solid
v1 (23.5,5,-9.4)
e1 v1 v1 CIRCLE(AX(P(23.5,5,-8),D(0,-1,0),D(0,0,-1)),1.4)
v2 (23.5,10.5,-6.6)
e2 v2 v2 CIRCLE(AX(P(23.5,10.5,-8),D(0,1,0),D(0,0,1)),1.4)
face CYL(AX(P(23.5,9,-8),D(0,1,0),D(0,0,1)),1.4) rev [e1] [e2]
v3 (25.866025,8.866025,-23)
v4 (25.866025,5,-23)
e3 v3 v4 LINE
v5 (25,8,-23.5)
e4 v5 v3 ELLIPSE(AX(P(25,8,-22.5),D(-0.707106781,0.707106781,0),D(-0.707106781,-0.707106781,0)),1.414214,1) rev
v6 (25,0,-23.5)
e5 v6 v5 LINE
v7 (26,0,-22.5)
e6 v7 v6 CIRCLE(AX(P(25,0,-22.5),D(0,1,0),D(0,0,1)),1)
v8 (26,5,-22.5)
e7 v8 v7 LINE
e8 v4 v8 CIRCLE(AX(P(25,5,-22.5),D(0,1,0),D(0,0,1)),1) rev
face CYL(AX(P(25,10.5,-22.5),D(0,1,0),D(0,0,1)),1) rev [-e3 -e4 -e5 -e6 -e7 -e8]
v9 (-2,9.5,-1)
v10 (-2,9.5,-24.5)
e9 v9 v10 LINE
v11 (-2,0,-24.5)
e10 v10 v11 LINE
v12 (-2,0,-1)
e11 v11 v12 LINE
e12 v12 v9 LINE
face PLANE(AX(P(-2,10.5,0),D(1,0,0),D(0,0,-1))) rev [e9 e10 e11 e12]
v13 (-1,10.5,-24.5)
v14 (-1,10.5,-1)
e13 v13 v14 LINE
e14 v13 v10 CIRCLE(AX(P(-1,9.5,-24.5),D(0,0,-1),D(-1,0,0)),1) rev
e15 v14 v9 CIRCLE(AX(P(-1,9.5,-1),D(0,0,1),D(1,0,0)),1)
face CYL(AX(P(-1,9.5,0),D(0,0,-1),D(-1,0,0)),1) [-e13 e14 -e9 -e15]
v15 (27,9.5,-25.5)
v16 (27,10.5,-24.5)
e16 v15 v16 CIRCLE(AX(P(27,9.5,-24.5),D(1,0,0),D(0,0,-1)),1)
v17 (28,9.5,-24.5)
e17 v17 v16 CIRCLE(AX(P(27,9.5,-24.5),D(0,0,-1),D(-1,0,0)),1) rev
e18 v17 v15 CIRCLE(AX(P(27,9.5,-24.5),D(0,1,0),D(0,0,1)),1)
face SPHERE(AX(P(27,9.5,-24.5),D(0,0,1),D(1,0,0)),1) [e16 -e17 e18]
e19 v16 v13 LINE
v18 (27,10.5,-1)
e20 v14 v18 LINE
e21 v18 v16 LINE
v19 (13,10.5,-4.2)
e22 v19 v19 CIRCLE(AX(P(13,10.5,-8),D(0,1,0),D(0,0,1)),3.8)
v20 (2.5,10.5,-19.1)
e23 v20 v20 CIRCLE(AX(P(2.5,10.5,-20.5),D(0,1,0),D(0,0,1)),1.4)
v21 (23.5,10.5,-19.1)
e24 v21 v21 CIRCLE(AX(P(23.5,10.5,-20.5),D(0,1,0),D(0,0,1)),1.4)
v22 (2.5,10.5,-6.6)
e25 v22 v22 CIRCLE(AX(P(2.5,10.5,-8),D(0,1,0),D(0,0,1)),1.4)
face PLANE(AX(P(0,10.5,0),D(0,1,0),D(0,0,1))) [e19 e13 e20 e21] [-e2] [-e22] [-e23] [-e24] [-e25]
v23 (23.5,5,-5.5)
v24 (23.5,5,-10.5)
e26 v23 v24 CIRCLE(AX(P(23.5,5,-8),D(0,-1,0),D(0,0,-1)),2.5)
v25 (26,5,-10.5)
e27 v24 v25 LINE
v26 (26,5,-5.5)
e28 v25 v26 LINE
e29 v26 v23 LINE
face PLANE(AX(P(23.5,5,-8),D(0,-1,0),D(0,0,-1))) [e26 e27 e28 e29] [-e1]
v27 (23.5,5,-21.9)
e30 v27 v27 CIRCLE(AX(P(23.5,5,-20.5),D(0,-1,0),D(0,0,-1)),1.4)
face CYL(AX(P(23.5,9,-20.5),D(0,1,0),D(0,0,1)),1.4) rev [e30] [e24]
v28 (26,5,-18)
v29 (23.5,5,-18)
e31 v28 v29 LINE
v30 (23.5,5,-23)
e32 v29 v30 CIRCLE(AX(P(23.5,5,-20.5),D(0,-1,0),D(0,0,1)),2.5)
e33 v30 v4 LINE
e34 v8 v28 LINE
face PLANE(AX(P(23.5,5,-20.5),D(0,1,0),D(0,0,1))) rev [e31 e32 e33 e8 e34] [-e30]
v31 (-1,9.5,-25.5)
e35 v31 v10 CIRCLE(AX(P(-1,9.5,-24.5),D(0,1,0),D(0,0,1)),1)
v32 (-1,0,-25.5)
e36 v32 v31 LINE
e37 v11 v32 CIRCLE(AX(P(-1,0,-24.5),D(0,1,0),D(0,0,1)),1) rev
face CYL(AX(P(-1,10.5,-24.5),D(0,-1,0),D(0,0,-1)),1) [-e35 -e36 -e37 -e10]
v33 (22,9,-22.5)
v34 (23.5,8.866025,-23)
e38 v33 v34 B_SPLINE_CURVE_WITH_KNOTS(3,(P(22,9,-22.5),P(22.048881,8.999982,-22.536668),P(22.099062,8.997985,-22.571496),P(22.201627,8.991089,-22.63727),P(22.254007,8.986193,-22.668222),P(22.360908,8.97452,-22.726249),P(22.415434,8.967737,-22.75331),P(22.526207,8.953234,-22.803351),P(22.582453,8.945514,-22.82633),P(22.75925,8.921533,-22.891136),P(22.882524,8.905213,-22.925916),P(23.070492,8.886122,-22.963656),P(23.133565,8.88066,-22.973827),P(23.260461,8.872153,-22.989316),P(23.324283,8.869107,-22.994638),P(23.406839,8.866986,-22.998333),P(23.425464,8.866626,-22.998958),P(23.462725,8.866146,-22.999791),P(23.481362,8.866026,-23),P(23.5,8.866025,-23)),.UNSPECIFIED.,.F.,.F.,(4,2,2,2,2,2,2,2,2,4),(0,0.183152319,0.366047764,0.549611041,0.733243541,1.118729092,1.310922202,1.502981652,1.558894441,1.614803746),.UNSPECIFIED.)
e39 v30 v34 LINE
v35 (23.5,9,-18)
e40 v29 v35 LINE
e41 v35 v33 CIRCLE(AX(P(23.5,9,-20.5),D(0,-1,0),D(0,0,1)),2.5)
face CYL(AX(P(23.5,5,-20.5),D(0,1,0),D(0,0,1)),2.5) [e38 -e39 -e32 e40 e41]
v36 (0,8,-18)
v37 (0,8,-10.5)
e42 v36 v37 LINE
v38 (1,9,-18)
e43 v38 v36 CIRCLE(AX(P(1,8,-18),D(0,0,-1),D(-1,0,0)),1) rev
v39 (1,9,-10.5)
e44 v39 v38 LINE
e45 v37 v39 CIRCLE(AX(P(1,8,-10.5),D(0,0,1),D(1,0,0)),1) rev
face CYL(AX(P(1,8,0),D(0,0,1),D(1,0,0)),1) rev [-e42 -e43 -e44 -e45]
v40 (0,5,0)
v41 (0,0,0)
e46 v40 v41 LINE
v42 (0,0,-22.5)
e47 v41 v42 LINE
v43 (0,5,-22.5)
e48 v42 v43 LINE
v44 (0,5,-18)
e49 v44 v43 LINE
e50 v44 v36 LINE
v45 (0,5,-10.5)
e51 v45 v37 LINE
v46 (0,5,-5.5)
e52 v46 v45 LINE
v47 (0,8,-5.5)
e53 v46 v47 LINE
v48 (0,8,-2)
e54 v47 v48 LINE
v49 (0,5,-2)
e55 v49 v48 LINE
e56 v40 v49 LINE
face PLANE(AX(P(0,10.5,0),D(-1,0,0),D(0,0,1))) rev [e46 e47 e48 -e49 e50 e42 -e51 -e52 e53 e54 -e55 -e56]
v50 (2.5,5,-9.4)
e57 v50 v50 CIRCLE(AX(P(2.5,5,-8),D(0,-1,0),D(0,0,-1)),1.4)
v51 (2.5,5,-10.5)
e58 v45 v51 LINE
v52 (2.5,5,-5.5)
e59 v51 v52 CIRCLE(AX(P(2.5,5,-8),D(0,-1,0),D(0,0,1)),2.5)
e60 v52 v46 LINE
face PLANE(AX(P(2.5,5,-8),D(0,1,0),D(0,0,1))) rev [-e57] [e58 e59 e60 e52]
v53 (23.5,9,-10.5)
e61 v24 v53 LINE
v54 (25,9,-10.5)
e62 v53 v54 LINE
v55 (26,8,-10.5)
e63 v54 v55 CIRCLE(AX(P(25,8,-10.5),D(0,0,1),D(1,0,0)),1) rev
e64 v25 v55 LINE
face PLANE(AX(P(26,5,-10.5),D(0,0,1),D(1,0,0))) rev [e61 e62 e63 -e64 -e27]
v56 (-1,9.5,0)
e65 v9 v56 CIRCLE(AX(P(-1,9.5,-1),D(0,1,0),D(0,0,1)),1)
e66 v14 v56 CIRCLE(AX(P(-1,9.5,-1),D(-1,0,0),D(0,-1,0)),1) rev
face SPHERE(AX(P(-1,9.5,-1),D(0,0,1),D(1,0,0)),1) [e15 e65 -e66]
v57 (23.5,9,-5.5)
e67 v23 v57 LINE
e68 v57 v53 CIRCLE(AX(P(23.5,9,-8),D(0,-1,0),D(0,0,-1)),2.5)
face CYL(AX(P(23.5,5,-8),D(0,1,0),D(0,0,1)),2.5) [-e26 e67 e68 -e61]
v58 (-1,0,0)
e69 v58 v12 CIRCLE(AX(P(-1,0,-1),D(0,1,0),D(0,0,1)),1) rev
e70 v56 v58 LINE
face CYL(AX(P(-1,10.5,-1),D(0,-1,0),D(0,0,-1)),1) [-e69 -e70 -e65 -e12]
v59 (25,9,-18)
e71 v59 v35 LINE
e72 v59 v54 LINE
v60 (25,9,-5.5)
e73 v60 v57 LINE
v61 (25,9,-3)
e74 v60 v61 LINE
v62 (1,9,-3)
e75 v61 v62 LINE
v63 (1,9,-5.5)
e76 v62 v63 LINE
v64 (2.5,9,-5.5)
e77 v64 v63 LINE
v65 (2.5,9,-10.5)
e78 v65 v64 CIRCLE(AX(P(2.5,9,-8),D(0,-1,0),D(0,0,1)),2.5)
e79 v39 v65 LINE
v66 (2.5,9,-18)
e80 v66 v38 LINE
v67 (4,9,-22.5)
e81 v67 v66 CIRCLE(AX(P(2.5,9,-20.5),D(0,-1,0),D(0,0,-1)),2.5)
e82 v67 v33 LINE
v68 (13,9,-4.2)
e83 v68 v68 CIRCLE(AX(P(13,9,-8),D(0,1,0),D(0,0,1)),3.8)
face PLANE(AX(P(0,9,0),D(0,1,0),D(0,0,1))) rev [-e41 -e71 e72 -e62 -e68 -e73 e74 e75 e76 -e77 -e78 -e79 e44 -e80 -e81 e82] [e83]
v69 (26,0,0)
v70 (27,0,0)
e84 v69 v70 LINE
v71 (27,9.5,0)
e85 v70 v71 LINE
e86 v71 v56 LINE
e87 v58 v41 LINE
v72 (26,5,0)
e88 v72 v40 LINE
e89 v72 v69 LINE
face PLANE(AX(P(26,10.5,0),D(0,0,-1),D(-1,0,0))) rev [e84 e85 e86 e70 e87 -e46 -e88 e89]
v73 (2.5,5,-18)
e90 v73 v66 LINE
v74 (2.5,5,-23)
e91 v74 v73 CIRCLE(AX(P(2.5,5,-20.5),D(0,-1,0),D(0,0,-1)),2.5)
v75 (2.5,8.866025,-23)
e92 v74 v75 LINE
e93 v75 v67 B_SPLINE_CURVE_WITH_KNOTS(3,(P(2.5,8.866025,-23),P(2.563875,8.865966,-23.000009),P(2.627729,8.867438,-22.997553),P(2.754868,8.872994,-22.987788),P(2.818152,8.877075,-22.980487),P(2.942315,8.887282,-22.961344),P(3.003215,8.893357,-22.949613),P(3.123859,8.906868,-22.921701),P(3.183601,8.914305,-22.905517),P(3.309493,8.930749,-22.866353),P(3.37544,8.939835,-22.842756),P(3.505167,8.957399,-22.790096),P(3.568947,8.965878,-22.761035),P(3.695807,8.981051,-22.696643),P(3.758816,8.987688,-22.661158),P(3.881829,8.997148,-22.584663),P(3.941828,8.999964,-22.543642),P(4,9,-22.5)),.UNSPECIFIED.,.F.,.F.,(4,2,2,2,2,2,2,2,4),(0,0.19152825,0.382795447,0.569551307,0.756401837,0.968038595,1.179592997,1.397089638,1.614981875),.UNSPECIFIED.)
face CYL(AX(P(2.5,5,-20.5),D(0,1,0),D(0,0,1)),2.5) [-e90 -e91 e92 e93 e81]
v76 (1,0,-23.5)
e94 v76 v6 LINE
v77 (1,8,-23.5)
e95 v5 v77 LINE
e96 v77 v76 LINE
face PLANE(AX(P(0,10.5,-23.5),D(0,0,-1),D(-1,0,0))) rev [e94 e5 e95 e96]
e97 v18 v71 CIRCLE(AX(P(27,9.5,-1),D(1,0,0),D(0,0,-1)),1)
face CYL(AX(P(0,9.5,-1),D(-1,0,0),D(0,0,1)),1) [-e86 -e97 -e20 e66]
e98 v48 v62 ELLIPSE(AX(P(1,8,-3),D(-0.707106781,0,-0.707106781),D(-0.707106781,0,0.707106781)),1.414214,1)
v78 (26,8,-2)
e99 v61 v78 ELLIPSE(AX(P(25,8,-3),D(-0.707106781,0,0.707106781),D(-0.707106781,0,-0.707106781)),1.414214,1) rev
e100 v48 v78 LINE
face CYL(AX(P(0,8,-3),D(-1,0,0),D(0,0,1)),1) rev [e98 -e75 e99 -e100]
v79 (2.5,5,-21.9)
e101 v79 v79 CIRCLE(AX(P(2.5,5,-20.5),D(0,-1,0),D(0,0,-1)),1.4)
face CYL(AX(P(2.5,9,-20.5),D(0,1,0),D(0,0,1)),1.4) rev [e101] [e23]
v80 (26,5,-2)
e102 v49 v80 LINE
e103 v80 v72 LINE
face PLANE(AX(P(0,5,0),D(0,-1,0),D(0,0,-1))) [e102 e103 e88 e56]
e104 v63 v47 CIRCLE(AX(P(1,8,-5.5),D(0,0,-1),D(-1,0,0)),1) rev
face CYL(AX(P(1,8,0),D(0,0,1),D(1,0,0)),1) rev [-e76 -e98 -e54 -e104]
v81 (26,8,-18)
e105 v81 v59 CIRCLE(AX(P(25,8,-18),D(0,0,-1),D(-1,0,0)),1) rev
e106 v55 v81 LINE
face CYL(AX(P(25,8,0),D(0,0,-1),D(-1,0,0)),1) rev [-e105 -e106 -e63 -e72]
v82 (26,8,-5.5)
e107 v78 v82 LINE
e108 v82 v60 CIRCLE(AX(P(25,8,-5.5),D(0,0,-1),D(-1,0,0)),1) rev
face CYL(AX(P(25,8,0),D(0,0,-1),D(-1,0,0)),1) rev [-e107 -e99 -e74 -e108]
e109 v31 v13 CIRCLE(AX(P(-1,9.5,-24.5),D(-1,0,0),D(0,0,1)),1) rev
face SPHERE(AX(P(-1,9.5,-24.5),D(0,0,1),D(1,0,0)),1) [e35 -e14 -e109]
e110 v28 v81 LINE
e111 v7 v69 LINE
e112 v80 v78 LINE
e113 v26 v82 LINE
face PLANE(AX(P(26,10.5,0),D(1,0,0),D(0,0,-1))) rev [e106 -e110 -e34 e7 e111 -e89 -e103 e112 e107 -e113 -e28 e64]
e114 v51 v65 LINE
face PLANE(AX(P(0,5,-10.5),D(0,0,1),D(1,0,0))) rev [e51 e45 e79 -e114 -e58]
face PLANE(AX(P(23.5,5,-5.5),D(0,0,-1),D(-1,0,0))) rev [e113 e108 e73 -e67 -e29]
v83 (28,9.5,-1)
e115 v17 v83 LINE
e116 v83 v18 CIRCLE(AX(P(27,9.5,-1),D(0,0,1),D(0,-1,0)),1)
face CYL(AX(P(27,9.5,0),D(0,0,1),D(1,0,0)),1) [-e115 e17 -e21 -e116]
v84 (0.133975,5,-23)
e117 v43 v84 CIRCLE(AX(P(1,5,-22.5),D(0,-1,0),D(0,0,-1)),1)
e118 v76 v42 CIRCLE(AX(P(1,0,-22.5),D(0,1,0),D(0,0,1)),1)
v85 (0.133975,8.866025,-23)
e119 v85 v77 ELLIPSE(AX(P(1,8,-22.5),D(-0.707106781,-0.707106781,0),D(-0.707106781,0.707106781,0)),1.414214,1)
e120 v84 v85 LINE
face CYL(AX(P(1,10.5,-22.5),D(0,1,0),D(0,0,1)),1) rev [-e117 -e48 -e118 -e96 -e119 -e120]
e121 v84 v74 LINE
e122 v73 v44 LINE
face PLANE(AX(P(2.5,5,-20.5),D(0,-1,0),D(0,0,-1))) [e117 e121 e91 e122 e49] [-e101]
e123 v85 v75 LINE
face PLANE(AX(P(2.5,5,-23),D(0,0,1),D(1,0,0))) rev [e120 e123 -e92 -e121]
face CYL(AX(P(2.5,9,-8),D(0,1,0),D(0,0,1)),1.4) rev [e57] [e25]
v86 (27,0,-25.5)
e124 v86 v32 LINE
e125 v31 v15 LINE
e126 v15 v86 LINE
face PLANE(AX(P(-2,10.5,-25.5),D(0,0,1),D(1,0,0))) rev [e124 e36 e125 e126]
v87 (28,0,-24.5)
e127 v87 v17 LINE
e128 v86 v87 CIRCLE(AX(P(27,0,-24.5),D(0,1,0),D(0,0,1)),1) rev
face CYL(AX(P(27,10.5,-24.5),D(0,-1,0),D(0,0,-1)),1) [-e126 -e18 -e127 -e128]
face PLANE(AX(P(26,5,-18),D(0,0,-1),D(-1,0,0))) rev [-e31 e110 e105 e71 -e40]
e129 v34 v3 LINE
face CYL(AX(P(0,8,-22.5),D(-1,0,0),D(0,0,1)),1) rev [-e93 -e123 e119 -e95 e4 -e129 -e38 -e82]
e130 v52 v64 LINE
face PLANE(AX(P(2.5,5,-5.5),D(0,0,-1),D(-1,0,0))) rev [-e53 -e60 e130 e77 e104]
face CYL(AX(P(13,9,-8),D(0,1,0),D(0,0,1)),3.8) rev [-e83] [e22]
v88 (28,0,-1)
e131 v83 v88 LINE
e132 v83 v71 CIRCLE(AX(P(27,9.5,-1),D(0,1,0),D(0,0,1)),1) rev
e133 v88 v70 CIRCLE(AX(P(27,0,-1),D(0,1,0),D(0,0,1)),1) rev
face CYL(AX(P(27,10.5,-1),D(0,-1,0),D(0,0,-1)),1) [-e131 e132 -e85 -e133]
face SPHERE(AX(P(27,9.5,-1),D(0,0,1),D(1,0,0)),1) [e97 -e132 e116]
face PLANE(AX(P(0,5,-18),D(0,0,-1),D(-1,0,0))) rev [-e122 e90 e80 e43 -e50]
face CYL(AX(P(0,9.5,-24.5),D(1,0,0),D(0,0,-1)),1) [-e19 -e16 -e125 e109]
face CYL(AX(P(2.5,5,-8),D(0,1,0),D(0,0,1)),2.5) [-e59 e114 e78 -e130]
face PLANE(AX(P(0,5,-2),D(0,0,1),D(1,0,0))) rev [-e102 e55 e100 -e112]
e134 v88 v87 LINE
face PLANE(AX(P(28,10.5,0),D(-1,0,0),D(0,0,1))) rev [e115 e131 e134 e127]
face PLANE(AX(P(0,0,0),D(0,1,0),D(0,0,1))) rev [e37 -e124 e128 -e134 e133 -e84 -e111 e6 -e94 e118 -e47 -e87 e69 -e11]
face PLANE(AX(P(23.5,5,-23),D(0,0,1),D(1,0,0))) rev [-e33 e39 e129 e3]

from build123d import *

# Parameters (mm, degrees)
BOSS_EXTRUDE1_DEPTH = 10.5
SKETCH3_R           = 1.4
SKETCH3_R_2         = 3.8
BOSS_EXTRUDE2_DEPTH = 1.5
SKETCH4_W           = 26
SKETCH4_H           = 2
SKETCH4_R           = 1.4
BOSS_EXTRUDE3_DEPTH = 4
FILLET1_R           = 1


with BuildPart() as part:
    # Sketch1 → Boss-Extrude1 (new body)
    with BuildSketch(Plane(origin=(0, 0, 0), x_dir=(1, 0, 0), z_dir=(0, 1, 0))):
        Polygon((26, 0), (28, 0), (28, 25.5), (-2, 25.5), (-2, 0), (0, 0), (0, 23.5), (26, 23.5), align=None)
    extrude(amount=BOSS_EXTRUDE1_DEPTH)

    # Sketch3 → Boss-Extrude2 (add)
    with BuildSketch(Plane(origin=(0, 10.5, 0), x_dir=(1, 0, 0), z_dir=(0, 1, 0))):
        Polygon((0, 0), (26, 0), (28, 0), (28, 25.5), (-2, 25.5), (-2, 0), align=None)
        with Locations(Location((2.5, 20.5, 0), (0, 0, 270))):
            Circle(SKETCH3_R, mode=Mode.SUBTRACT)
        with Locations(Location((2.5, 8, 0), (0, 0, 270))):
            Circle(SKETCH3_R, mode=Mode.SUBTRACT)
        with Locations(Location((23.5, 8, 0), (0, 0, 270))):
            Circle(SKETCH3_R, mode=Mode.SUBTRACT)
        with Locations(Location((23.5, 20.5, 0), (0, 0, 270))):
            Circle(SKETCH3_R, mode=Mode.SUBTRACT)
        with Locations(Location((13, 8, 0), (0, 0, 270))):
            Circle(SKETCH3_R_2, mode=Mode.SUBTRACT)
    extrude(amount=-BOSS_EXTRUDE2_DEPTH)

    # Sketch4 → Boss-Extrude3 (add)
    # profile 1 of 5: a face of its own
    with BuildSketch(Plane.XZ.offset(-9)):
        with Locations((13, -1)):
            Rectangle(SKETCH4_W, SKETCH4_H)
    # profile 2 of 5: a face of its own
    with BuildSketch(Plane.XZ.offset(-9)):
        with BuildLine():
            Line((2.5, -5.5), (0, -5.5))
            Line((0, -5.5), (0, -10.5))
            Line((0, -10.5), (2.5, -10.5))
            ThreePointArc((2.5, -10.5), (5, -8), (2.5, -5.5))
        make_face()
        with Locations(Location((2.5, -8, 0), (0, 0, 90))):
            Circle(SKETCH4_R, mode=Mode.SUBTRACT)
    # profile 3 of 5: a face of its own
    with BuildSketch(Plane.XZ.offset(-9)):
        with BuildLine():
            Line((2.5, -23), (0, -23))
            Line((0, -23), (0, -18))
            Line((0, -18), (2.5, -18))
            ThreePointArc((2.5, -18), (5, -20.5), (2.5, -23))
        make_face()
        with Locations(Location((2.5, -20.5, 0), (0, 0, 90))):
            Circle(SKETCH4_R, mode=Mode.SUBTRACT)
    # profile 4 of 5: a face of its own
    with BuildSketch(Plane.XZ.offset(-9)):
        with BuildLine():
            Line((26, -23), (26, -18))
            Line((26, -18), (23.5, -18))
            ThreePointArc((23.5, -18), (21, -20.5), (23.5, -23))
            Line((23.5, -23), (26, -23))
        make_face()
        with Locations(Location((23.5, -20.5, 0), (0, 0, 90))):
            Circle(SKETCH4_R, mode=Mode.SUBTRACT)
    # profile 5 of 5: a face of its own
    with BuildSketch(Plane.XZ.offset(-9)):
        with BuildLine():
            Line((23.5, -5.5), (26, -5.5))
            Line((26, -5.5), (26, -10.5))
            Line((26, -10.5), (23.5, -10.5))
            ThreePointArc((23.5, -10.5), (21, -8), (23.5, -5.5))
        make_face()
        with Locations(Location((23.5, -8, 0), (0, 0, 90))):
            Circle(SKETCH4_R, mode=Mode.SUBTRACT)
    extrude(amount=BOSS_EXTRUDE3_DEPTH)

    # Fillet1
    # the kernel refuses this fillet: 1 mm, written as the material it adds along each edge
    with BuildSketch(Plane(origin=(0, 9, -23.5), x_dir=(0, -1, 0), z_dir=(1, 0, 0)), Plane(origin=(26, 9, -2), x_dir=(0, -1, 0), z_dir=(-1, 0, 0))) as fillet1_piece_1:
        with BuildLine():
            CenterArc((FILLET1_R, -FILLET1_R), FILLET1_R, 90, 90)
            Line((0, -FILLET1_R), (-FILLET1_R * 0.02, -FILLET1_R))
            Line((-FILLET1_R * 0.02, -FILLET1_R), (-FILLET1_R * 0.02, FILLET1_R * 0.02))
            Line((-FILLET1_R * 0.02, FILLET1_R * 0.02), (FILLET1_R, FILLET1_R * 0.02))
            Line((FILLET1_R, FILLET1_R * 0.02), (FILLET1_R, 0))
        make_face()
    extrude(amount=26)
    with BuildSketch(Plane(origin=(26, 9, -5.5), x_dir=(0, -1, 0), z_dir=(0, 0, 1)), Plane(origin=(0, 9, -2), x_dir=(0, -1, 0), z_dir=(0, 0, -1))) as fillet1_piece_2:
        with BuildLine():
            CenterArc((FILLET1_R, -FILLET1_R), FILLET1_R, 90, 90)
            Line((0, -FILLET1_R), (-FILLET1_R * 0.02, -FILLET1_R))
            Line((-FILLET1_R * 0.02, -FILLET1_R), (-FILLET1_R * 0.02, FILLET1_R * 0.02))
            Line((-FILLET1_R * 0.02, FILLET1_R * 0.02), (FILLET1_R, FILLET1_R * 0.02))
            Line((FILLET1_R, FILLET1_R * 0.02), (FILLET1_R, 0))
        make_face()
    extrude(amount=3.5)
    with BuildSketch(Plane(origin=(26, 9, -18), x_dir=(0, -1, 0), z_dir=(0, 0, 1)), Plane(origin=(0, 9, -10.5), x_dir=(0, -1, 0), z_dir=(0, 0, -1))) as fillet1_piece_3:
        with BuildLine():
            CenterArc((FILLET1_R, -FILLET1_R), FILLET1_R, 90, 90)
            Line((0, -FILLET1_R), (-FILLET1_R * 0.02, -FILLET1_R))
            Line((-FILLET1_R * 0.02, -FILLET1_R), (-FILLET1_R * 0.02, FILLET1_R * 0.02))
            Line((-FILLET1_R * 0.02, FILLET1_R * 0.02), (FILLET1_R, FILLET1_R * 0.02))
            Line((FILLET1_R, FILLET1_R * 0.02), (FILLET1_R, 0))
        make_face()
    extrude(amount=7.5)
    with BuildSketch(Plane(origin=(0, 0, -23.5), x_dir=(0, 0, 1), z_dir=(0, 1, 0))) as fillet1_piece_4:
        with BuildLine():
            CenterArc((FILLET1_R, FILLET1_R), FILLET1_R, 180, 90)
            Line((0, FILLET1_R), (-FILLET1_R * 0.02, FILLET1_R))
            Line((-FILLET1_R * 0.02, FILLET1_R), (-FILLET1_R * 0.02, -FILLET1_R * 0.02))
            Line((-FILLET1_R * 0.02, -FILLET1_R * 0.02), (FILLET1_R, -FILLET1_R * 0.02))
            Line((FILLET1_R, -FILLET1_R * 0.02), (FILLET1_R, 0))
        make_face()
    extrude(amount=9)
    with BuildSketch(Plane(origin=(26, 0, -23.5), x_dir=(0, 0, 1), z_dir=(0, 1, 0))) as fillet1_piece_5:
        with BuildLine():
            CenterArc((FILLET1_R, -FILLET1_R), FILLET1_R, 90, 90)
            Line((0, -FILLET1_R), (-FILLET1_R * 0.02, -FILLET1_R))
            Line((-FILLET1_R * 0.02, -FILLET1_R), (-FILLET1_R * 0.02, FILLET1_R * 0.02))
            Line((-FILLET1_R * 0.02, FILLET1_R * 0.02), (FILLET1_R, FILLET1_R * 0.02))
            Line((FILLET1_R, FILLET1_R * 0.02), (FILLET1_R, 0))
        make_face()
    extrude(amount=9)
    with BuildSketch(Plane(origin=(0, 0, -23.5), x_dir=(0, 0, 1), z_dir=(0, 1, 0))) as fillet1_piece_6a_section:
        with BuildLine():
            CenterArc((FILLET1_R, FILLET1_R), FILLET1_R, 180, 90)
            Line((0, FILLET1_R), (-FILLET1_R * 0.02, FILLET1_R))
            Line((-FILLET1_R * 0.02, FILLET1_R), (-FILLET1_R * 0.02, -FILLET1_R * 0.02))
            Line((-FILLET1_R * 0.02, -FILLET1_R * 0.02), (FILLET1_R, -FILLET1_R * 0.02))
            Line((FILLET1_R, -FILLET1_R * 0.02), (FILLET1_R, 0))
        make_face()
    fillet1_piece_6a = extrude(amount=11.5, mode=Mode.PRIVATE)
    fillet1_piece_6a = split(fillet1_piece_6a, bisect_by=Plane(origin=(0.226395114, 9, -23.273604886), z_dir=(0, 1, 0)), keep=Keep.TOP, mode=Mode.PRIVATE)
    with BuildSketch(Plane(origin=(-2.5, 9, -23.5), x_dir=(0, -1, 0), z_dir=(1, 0, 0))) as fillet1_piece_6b_section:
        with BuildLine():
            CenterArc((FILLET1_R, -FILLET1_R), FILLET1_R, 90, 90)
            Line((0, -FILLET1_R), (-FILLET1_R * 0.02, -FILLET1_R))
            Line((-FILLET1_R * 0.02, -FILLET1_R), (-FILLET1_R * 0.02, FILLET1_R * 0.02))
            Line((-FILLET1_R * 0.02, FILLET1_R * 0.02), (FILLET1_R, FILLET1_R * 0.02))
            Line((FILLET1_R, FILLET1_R * 0.02), (FILLET1_R, 0))
        make_face()
    fillet1_piece_6b = extrude(amount=28.5, mode=Mode.PRIVATE)
    fillet1_piece_6b = split(fillet1_piece_6b, bisect_by=Plane(origin=(0, 8.773604886, -23.273604886), z_dir=(-1, 0, 0)), keep=Keep.TOP, mode=Mode.PRIVATE)
    fillet1_piece_6 = fillet1_piece_6a & fillet1_piece_6b
    add(fillet1_piece_6)
    with BuildSketch(Plane(origin=(26, 0, -23.5), x_dir=(0, 0, 1), z_dir=(0, 1, 0))) as fillet1_piece_7a_section:
        with BuildLine():
            CenterArc((FILLET1_R, -FILLET1_R), FILLET1_R, 90, 90)
            Line((0, -FILLET1_R), (-FILLET1_R * 0.02, -FILLET1_R))
            Line((-FILLET1_R * 0.02, -FILLET1_R), (-FILLET1_R * 0.02, FILLET1_R * 0.02))
            Line((-FILLET1_R * 0.02, FILLET1_R * 0.02), (FILLET1_R, FILLET1_R * 0.02))
            Line((FILLET1_R, FILLET1_R * 0.02), (FILLET1_R, 0))
        make_face()
    fillet1_piece_7a = extrude(amount=11.5, mode=Mode.PRIVATE)
    fillet1_piece_7a = split(fillet1_piece_7a, bisect_by=Plane(origin=(25.773604886, 9, -23.273604886), z_dir=(0, 1, 0)), keep=Keep.TOP, mode=Mode.PRIVATE)
    with BuildSketch(Plane(origin=(0, 9, -23.5), x_dir=(0, -1, 0), z_dir=(1, 0, 0))) as fillet1_piece_7b_section:
        with BuildLine():
            CenterArc((FILLET1_R, -FILLET1_R), FILLET1_R, 90, 90)
            Line((0, -FILLET1_R), (-FILLET1_R * 0.02, -FILLET1_R))
            Line((-FILLET1_R * 0.02, -FILLET1_R), (-FILLET1_R * 0.02, FILLET1_R * 0.02))
            Line((-FILLET1_R * 0.02, FILLET1_R * 0.02), (FILLET1_R, FILLET1_R * 0.02))
            Line((FILLET1_R, FILLET1_R * 0.02), (FILLET1_R, 0))
        make_face()
    fillet1_piece_7b = extrude(amount=28.5, mode=Mode.PRIVATE)
    fillet1_piece_7b = split(fillet1_piece_7b, bisect_by=Plane(origin=(26, 8.773604886, -23.273604886), z_dir=(1, 0, 0)), keep=Keep.TOP, mode=Mode.PRIVATE)
    fillet1_piece_7 = fillet1_piece_7a & fillet1_piece_7b
    add(fillet1_piece_7)
    with BuildSketch(Plane(origin=(26, 9, -5.5), x_dir=(0, -1, 0), z_dir=(0, 0, 1))) as fillet1_piece_8a_section:
        with BuildLine():
            CenterArc((FILLET1_R, -FILLET1_R), FILLET1_R, 90, 90)
            Line((0, -FILLET1_R), (-FILLET1_R * 0.02, -FILLET1_R))
            Line((-FILLET1_R * 0.02, -FILLET1_R), (-FILLET1_R * 0.02, FILLET1_R * 0.02))
            Line((-FILLET1_R * 0.02, FILLET1_R * 0.02), (FILLET1_R, FILLET1_R * 0.02))
            Line((FILLET1_R, FILLET1_R * 0.02), (FILLET1_R, 0))
        make_face()
    fillet1_piece_8a = extrude(amount=6, mode=Mode.PRIVATE)
    fillet1_piece_8a = split(fillet1_piece_8a, bisect_by=Plane(origin=(25.773604886, 8.773604886, -2), z_dir=(0, 0, 1)), keep=Keep.TOP, mode=Mode.PRIVATE)
    with BuildSketch(Plane(origin=(28.5, 9, -2), x_dir=(0, -1, 0), z_dir=(-1, 0, 0))) as fillet1_piece_8b_section:
        with BuildLine():
            CenterArc((FILLET1_R, -FILLET1_R), FILLET1_R, 90, 90)
            Line((0, -FILLET1_R), (-FILLET1_R * 0.02, -FILLET1_R))
            Line((-FILLET1_R * 0.02, -FILLET1_R), (-FILLET1_R * 0.02, FILLET1_R * 0.02))
            Line((-FILLET1_R * 0.02, FILLET1_R * 0.02), (FILLET1_R, FILLET1_R * 0.02))
            Line((FILLET1_R, FILLET1_R * 0.02), (FILLET1_R, 0))
        make_face()
    fillet1_piece_8b = extrude(amount=28.5, mode=Mode.PRIVATE)
    fillet1_piece_8b = split(fillet1_piece_8b, bisect_by=Plane(origin=(26, 8.773604886, -2.226395114), z_dir=(1, 0, 0)), keep=Keep.TOP, mode=Mode.PRIVATE)
    fillet1_piece_8 = fillet1_piece_8a & fillet1_piece_8b
    add(fillet1_piece_8)
    with BuildSketch(Plane(origin=(0, 9, 0.5), x_dir=(0, -1, 0), z_dir=(0, 0, -1))) as fillet1_piece_9a_section:
        with BuildLine():
            CenterArc((FILLET1_R, -FILLET1_R), FILLET1_R, 90, 90)
            Line((0, -FILLET1_R), (-FILLET1_R * 0.02, -FILLET1_R))
            Line((-FILLET1_R * 0.02, -FILLET1_R), (-FILLET1_R * 0.02, FILLET1_R * 0.02))
            Line((-FILLET1_R * 0.02, FILLET1_R * 0.02), (FILLET1_R, FILLET1_R * 0.02))
            Line((FILLET1_R, FILLET1_R * 0.02), (FILLET1_R, 0))
        make_face()
    fillet1_piece_9a = extrude(amount=6, mode=Mode.PRIVATE)
    fillet1_piece_9a = split(fillet1_piece_9a, bisect_by=Plane(origin=(0.226395114, 8.773604886, -2), z_dir=(0, 0, 1)), keep=Keep.TOP, mode=Mode.PRIVATE)
    with BuildSketch(Plane(origin=(26, 9, -2), x_dir=(0, -1, 0), z_dir=(-1, 0, 0))) as fillet1_piece_9b_section:
        with BuildLine():
            CenterArc((FILLET1_R, -FILLET1_R), FILLET1_R, 90, 90)
            Line((0, -FILLET1_R), (-FILLET1_R * 0.02, -FILLET1_R))
            Line((-FILLET1_R * 0.02, -FILLET1_R), (-FILLET1_R * 0.02, FILLET1_R * 0.02))
            Line((-FILLET1_R * 0.02, FILLET1_R * 0.02), (FILLET1_R, FILLET1_R * 0.02))
            Line((FILLET1_R, FILLET1_R * 0.02), (FILLET1_R, 0))
        make_face()
    fillet1_piece_9b = extrude(amount=28.5, mode=Mode.PRIVATE)
    fillet1_piece_9b = split(fillet1_piece_9b, bisect_by=Plane(origin=(0, 8.773604886, -2.226395114), z_dir=(-1, 0, 0)), keep=Keep.TOP, mode=Mode.PRIVATE)
    fillet1_piece_9 = fillet1_piece_9a & fillet1_piece_9b
    add(fillet1_piece_9)
    # the kernel refuses this fillet: 1 mm, written as the material it takes off along each edge
    with BuildSketch(Plane(origin=(27, 9.5, -1), x_dir=(0, 1, 0), z_dir=(0, 0, 1))) as fillet1_2_piece_1_section:
        Polygon((0, 0), (FILLET1_R * 1.02, 0), (FILLET1_R * 1.02, -FILLET1_R * 1.02), (0, -FILLET1_R * 1.02), align=None)
    fillet1_2_piece_1 = extrude(amount=FILLET1_R * 1.02, mode=Mode.PRIVATE)
    fillet1_2_piece_1 = fillet1_2_piece_1 - Plane(origin=(27, 9.5, -1), x_dir=(-0.7071067811865475, -0.7071067811865475, 0), z_dir=(0, 0, 1)) * Sphere(FILLET1_R, mode=Mode.PRIVATE)
    add(fillet1_2_piece_1, mode=Mode.SUBTRACT)
    with BuildSketch(Plane(origin=(-1, 9.5, -1), x_dir=(-1, 0, 0), z_dir=(0, 0, 1))) as fillet1_2_piece_2_section:
        Polygon((0, 0), (FILLET1_R * 1.02, 0), (FILLET1_R * 1.02, -FILLET1_R * 1.02), (0, -FILLET1_R * 1.02), align=None)
    fillet1_2_piece_2 = extrude(amount=FILLET1_R * 1.02, mode=Mode.PRIVATE)
    fillet1_2_piece_2 = fillet1_2_piece_2 - Plane(origin=(-1, 9.5, -1), x_dir=(0.7071067811865475, -0.7071067811865475, 0), z_dir=(0, 0, 1)) * Sphere(FILLET1_R, mode=Mode.PRIVATE)
    add(fillet1_2_piece_2, mode=Mode.SUBTRACT)
    with BuildSketch(Plane(origin=(27, 9.5, -24.5), x_dir=(0, 1, 0), z_dir=(0, 0, -1))) as fillet1_2_piece_3_section:
        Polygon((0, 0), (FILLET1_R * 1.02, 0), (FILLET1_R * 1.02, FILLET1_R * 1.02), (0, FILLET1_R * 1.02), align=None)
    fillet1_2_piece_3 = extrude(amount=FILLET1_R * 1.02, mode=Mode.PRIVATE)
    fillet1_2_piece_3 = fillet1_2_piece_3 - Plane(origin=(27, 9.5, -24.5), x_dir=(-0.7071067811865475, -0.7071067811865475, 0), z_dir=(0, 0, -1)) * Sphere(FILLET1_R, mode=Mode.PRIVATE)
    add(fillet1_2_piece_3, mode=Mode.SUBTRACT)
    with BuildSketch(Plane(origin=(-1, 9.5, -24.5), x_dir=(-1, 0, 0), z_dir=(0, 0, -1))) as fillet1_2_piece_4_section:
        Polygon((0, 0), (FILLET1_R * 1.02, 0), (FILLET1_R * 1.02, FILLET1_R * 1.02), (0, FILLET1_R * 1.02), align=None)
    fillet1_2_piece_4 = extrude(amount=FILLET1_R * 1.02, mode=Mode.PRIVATE)
    fillet1_2_piece_4 = fillet1_2_piece_4 - Plane(origin=(-1, 9.5, -24.5), x_dir=(0.7071067811865475, -0.7071067811865475, 0), z_dir=(0, 0, -1)) * Sphere(FILLET1_R, mode=Mode.PRIVATE)
    add(fillet1_2_piece_4, mode=Mode.SUBTRACT)
    with BuildSketch(Plane(origin=(28, 0, 0), x_dir=(-1, 0, 0), z_dir=(0, 1, 0)), Plane(origin=(-2, 9.5, 0), x_dir=(1, 0, 0), z_dir=(0, -1, 0)), Plane(origin=(28, 0, -25.5), x_dir=(0, 0, 1), z_dir=(0, 1, 0))) as fillet1_2_piece_5:
        with BuildLine():
            CenterArc((FILLET1_R, -FILLET1_R), FILLET1_R, 90, 90)
            Line((0, -FILLET1_R), (-FILLET1_R * 0.02, -FILLET1_R))
            Line((-FILLET1_R * 0.02, -FILLET1_R), (-FILLET1_R * 0.02, FILLET1_R * 0.02))
            Line((-FILLET1_R * 0.02, FILLET1_R * 0.02), (FILLET1_R, FILLET1_R * 0.02))
            Line((FILLET1_R, FILLET1_R * 0.02), (FILLET1_R, 0))
        make_face()
    extrude(amount=9.5, mode=Mode.SUBTRACT)
    with BuildSketch(Plane(origin=(27, 10.5, -25.5), x_dir=(0, 0, 1), z_dir=(-1, 0, 0)), Plane(origin=(27, 10.5, 0), x_dir=(0, -1, 0), z_dir=(-1, 0, 0))) as fillet1_2_piece_6:
        with BuildLine():
            CenterArc((FILLET1_R, -FILLET1_R), FILLET1_R, 90, 90)
            Line((0, -FILLET1_R), (-FILLET1_R * 0.02, -FILLET1_R))
            Line((-FILLET1_R * 0.02, -FILLET1_R), (-FILLET1_R * 0.02, FILLET1_R * 0.02))
            Line((-FILLET1_R * 0.02, FILLET1_R * 0.02), (FILLET1_R, FILLET1_R * 0.02))
            Line((FILLET1_R, FILLET1_R * 0.02), (FILLET1_R, 0))
        make_face()
    extrude(amount=28, mode=Mode.SUBTRACT)
    with BuildSketch(Plane(origin=(-2, 0, -25.5), x_dir=(0, 0, 1), z_dir=(0, 1, 0))) as fillet1_2_piece_7:
        with BuildLine():
            CenterArc((FILLET1_R, FILLET1_R), FILLET1_R, 180, 90)
            Line((0, FILLET1_R), (-FILLET1_R * 0.02, FILLET1_R))
            Line((-FILLET1_R * 0.02, FILLET1_R), (-FILLET1_R * 0.02, -FILLET1_R * 0.02))
            Line((-FILLET1_R * 0.02, -FILLET1_R * 0.02), (FILLET1_R, -FILLET1_R * 0.02))
            Line((FILLET1_R, -FILLET1_R * 0.02), (FILLET1_R, 0))
        make_face()
    extrude(amount=9.5, mode=Mode.SUBTRACT)
    with BuildSketch(Plane(origin=(-2, 10.5, -24.5), x_dir=(0, -1, 0), z_dir=(0, 0, 1))) as fillet1_2_piece_8:
        with BuildLine():
            CenterArc((FILLET1_R, FILLET1_R), FILLET1_R, 180, 90)
            Line((0, FILLET1_R), (-FILLET1_R * 0.02, FILLET1_R))
            Line((-FILLET1_R * 0.02, FILLET1_R), (-FILLET1_R * 0.02, -FILLET1_R * 0.02))
            Line((-FILLET1_R * 0.02, -FILLET1_R * 0.02), (FILLET1_R, -FILLET1_R * 0.02))
            Line((FILLET1_R, -FILLET1_R * 0.02), (FILLET1_R, 0))
        make_face()
    extrude(amount=23.5, mode=Mode.SUBTRACT)
    with BuildSketch(Plane(origin=(28, 10.5, -1), x_dir=(-1, 0, 0), z_dir=(0, 0, -1))) as fillet1_2_piece_9:
        with BuildLine():
            CenterArc((FILLET1_R, -FILLET1_R), FILLET1_R, 90, 90)
            Line((0, -FILLET1_R), (-FILLET1_R * 0.02, -FILLET1_R))
            Line((-FILLET1_R * 0.02, -FILLET1_R), (-FILLET1_R * 0.02, FILLET1_R * 0.02))
            Line((-FILLET1_R * 0.02, FILLET1_R * 0.02), (FILLET1_R, FILLET1_R * 0.02))
            Line((FILLET1_R, FILLET1_R * 0.02), (FILLET1_R, 0))
        make_face()
    extrude(amount=23.5, mode=Mode.SUBTRACT)


solid = part.part
